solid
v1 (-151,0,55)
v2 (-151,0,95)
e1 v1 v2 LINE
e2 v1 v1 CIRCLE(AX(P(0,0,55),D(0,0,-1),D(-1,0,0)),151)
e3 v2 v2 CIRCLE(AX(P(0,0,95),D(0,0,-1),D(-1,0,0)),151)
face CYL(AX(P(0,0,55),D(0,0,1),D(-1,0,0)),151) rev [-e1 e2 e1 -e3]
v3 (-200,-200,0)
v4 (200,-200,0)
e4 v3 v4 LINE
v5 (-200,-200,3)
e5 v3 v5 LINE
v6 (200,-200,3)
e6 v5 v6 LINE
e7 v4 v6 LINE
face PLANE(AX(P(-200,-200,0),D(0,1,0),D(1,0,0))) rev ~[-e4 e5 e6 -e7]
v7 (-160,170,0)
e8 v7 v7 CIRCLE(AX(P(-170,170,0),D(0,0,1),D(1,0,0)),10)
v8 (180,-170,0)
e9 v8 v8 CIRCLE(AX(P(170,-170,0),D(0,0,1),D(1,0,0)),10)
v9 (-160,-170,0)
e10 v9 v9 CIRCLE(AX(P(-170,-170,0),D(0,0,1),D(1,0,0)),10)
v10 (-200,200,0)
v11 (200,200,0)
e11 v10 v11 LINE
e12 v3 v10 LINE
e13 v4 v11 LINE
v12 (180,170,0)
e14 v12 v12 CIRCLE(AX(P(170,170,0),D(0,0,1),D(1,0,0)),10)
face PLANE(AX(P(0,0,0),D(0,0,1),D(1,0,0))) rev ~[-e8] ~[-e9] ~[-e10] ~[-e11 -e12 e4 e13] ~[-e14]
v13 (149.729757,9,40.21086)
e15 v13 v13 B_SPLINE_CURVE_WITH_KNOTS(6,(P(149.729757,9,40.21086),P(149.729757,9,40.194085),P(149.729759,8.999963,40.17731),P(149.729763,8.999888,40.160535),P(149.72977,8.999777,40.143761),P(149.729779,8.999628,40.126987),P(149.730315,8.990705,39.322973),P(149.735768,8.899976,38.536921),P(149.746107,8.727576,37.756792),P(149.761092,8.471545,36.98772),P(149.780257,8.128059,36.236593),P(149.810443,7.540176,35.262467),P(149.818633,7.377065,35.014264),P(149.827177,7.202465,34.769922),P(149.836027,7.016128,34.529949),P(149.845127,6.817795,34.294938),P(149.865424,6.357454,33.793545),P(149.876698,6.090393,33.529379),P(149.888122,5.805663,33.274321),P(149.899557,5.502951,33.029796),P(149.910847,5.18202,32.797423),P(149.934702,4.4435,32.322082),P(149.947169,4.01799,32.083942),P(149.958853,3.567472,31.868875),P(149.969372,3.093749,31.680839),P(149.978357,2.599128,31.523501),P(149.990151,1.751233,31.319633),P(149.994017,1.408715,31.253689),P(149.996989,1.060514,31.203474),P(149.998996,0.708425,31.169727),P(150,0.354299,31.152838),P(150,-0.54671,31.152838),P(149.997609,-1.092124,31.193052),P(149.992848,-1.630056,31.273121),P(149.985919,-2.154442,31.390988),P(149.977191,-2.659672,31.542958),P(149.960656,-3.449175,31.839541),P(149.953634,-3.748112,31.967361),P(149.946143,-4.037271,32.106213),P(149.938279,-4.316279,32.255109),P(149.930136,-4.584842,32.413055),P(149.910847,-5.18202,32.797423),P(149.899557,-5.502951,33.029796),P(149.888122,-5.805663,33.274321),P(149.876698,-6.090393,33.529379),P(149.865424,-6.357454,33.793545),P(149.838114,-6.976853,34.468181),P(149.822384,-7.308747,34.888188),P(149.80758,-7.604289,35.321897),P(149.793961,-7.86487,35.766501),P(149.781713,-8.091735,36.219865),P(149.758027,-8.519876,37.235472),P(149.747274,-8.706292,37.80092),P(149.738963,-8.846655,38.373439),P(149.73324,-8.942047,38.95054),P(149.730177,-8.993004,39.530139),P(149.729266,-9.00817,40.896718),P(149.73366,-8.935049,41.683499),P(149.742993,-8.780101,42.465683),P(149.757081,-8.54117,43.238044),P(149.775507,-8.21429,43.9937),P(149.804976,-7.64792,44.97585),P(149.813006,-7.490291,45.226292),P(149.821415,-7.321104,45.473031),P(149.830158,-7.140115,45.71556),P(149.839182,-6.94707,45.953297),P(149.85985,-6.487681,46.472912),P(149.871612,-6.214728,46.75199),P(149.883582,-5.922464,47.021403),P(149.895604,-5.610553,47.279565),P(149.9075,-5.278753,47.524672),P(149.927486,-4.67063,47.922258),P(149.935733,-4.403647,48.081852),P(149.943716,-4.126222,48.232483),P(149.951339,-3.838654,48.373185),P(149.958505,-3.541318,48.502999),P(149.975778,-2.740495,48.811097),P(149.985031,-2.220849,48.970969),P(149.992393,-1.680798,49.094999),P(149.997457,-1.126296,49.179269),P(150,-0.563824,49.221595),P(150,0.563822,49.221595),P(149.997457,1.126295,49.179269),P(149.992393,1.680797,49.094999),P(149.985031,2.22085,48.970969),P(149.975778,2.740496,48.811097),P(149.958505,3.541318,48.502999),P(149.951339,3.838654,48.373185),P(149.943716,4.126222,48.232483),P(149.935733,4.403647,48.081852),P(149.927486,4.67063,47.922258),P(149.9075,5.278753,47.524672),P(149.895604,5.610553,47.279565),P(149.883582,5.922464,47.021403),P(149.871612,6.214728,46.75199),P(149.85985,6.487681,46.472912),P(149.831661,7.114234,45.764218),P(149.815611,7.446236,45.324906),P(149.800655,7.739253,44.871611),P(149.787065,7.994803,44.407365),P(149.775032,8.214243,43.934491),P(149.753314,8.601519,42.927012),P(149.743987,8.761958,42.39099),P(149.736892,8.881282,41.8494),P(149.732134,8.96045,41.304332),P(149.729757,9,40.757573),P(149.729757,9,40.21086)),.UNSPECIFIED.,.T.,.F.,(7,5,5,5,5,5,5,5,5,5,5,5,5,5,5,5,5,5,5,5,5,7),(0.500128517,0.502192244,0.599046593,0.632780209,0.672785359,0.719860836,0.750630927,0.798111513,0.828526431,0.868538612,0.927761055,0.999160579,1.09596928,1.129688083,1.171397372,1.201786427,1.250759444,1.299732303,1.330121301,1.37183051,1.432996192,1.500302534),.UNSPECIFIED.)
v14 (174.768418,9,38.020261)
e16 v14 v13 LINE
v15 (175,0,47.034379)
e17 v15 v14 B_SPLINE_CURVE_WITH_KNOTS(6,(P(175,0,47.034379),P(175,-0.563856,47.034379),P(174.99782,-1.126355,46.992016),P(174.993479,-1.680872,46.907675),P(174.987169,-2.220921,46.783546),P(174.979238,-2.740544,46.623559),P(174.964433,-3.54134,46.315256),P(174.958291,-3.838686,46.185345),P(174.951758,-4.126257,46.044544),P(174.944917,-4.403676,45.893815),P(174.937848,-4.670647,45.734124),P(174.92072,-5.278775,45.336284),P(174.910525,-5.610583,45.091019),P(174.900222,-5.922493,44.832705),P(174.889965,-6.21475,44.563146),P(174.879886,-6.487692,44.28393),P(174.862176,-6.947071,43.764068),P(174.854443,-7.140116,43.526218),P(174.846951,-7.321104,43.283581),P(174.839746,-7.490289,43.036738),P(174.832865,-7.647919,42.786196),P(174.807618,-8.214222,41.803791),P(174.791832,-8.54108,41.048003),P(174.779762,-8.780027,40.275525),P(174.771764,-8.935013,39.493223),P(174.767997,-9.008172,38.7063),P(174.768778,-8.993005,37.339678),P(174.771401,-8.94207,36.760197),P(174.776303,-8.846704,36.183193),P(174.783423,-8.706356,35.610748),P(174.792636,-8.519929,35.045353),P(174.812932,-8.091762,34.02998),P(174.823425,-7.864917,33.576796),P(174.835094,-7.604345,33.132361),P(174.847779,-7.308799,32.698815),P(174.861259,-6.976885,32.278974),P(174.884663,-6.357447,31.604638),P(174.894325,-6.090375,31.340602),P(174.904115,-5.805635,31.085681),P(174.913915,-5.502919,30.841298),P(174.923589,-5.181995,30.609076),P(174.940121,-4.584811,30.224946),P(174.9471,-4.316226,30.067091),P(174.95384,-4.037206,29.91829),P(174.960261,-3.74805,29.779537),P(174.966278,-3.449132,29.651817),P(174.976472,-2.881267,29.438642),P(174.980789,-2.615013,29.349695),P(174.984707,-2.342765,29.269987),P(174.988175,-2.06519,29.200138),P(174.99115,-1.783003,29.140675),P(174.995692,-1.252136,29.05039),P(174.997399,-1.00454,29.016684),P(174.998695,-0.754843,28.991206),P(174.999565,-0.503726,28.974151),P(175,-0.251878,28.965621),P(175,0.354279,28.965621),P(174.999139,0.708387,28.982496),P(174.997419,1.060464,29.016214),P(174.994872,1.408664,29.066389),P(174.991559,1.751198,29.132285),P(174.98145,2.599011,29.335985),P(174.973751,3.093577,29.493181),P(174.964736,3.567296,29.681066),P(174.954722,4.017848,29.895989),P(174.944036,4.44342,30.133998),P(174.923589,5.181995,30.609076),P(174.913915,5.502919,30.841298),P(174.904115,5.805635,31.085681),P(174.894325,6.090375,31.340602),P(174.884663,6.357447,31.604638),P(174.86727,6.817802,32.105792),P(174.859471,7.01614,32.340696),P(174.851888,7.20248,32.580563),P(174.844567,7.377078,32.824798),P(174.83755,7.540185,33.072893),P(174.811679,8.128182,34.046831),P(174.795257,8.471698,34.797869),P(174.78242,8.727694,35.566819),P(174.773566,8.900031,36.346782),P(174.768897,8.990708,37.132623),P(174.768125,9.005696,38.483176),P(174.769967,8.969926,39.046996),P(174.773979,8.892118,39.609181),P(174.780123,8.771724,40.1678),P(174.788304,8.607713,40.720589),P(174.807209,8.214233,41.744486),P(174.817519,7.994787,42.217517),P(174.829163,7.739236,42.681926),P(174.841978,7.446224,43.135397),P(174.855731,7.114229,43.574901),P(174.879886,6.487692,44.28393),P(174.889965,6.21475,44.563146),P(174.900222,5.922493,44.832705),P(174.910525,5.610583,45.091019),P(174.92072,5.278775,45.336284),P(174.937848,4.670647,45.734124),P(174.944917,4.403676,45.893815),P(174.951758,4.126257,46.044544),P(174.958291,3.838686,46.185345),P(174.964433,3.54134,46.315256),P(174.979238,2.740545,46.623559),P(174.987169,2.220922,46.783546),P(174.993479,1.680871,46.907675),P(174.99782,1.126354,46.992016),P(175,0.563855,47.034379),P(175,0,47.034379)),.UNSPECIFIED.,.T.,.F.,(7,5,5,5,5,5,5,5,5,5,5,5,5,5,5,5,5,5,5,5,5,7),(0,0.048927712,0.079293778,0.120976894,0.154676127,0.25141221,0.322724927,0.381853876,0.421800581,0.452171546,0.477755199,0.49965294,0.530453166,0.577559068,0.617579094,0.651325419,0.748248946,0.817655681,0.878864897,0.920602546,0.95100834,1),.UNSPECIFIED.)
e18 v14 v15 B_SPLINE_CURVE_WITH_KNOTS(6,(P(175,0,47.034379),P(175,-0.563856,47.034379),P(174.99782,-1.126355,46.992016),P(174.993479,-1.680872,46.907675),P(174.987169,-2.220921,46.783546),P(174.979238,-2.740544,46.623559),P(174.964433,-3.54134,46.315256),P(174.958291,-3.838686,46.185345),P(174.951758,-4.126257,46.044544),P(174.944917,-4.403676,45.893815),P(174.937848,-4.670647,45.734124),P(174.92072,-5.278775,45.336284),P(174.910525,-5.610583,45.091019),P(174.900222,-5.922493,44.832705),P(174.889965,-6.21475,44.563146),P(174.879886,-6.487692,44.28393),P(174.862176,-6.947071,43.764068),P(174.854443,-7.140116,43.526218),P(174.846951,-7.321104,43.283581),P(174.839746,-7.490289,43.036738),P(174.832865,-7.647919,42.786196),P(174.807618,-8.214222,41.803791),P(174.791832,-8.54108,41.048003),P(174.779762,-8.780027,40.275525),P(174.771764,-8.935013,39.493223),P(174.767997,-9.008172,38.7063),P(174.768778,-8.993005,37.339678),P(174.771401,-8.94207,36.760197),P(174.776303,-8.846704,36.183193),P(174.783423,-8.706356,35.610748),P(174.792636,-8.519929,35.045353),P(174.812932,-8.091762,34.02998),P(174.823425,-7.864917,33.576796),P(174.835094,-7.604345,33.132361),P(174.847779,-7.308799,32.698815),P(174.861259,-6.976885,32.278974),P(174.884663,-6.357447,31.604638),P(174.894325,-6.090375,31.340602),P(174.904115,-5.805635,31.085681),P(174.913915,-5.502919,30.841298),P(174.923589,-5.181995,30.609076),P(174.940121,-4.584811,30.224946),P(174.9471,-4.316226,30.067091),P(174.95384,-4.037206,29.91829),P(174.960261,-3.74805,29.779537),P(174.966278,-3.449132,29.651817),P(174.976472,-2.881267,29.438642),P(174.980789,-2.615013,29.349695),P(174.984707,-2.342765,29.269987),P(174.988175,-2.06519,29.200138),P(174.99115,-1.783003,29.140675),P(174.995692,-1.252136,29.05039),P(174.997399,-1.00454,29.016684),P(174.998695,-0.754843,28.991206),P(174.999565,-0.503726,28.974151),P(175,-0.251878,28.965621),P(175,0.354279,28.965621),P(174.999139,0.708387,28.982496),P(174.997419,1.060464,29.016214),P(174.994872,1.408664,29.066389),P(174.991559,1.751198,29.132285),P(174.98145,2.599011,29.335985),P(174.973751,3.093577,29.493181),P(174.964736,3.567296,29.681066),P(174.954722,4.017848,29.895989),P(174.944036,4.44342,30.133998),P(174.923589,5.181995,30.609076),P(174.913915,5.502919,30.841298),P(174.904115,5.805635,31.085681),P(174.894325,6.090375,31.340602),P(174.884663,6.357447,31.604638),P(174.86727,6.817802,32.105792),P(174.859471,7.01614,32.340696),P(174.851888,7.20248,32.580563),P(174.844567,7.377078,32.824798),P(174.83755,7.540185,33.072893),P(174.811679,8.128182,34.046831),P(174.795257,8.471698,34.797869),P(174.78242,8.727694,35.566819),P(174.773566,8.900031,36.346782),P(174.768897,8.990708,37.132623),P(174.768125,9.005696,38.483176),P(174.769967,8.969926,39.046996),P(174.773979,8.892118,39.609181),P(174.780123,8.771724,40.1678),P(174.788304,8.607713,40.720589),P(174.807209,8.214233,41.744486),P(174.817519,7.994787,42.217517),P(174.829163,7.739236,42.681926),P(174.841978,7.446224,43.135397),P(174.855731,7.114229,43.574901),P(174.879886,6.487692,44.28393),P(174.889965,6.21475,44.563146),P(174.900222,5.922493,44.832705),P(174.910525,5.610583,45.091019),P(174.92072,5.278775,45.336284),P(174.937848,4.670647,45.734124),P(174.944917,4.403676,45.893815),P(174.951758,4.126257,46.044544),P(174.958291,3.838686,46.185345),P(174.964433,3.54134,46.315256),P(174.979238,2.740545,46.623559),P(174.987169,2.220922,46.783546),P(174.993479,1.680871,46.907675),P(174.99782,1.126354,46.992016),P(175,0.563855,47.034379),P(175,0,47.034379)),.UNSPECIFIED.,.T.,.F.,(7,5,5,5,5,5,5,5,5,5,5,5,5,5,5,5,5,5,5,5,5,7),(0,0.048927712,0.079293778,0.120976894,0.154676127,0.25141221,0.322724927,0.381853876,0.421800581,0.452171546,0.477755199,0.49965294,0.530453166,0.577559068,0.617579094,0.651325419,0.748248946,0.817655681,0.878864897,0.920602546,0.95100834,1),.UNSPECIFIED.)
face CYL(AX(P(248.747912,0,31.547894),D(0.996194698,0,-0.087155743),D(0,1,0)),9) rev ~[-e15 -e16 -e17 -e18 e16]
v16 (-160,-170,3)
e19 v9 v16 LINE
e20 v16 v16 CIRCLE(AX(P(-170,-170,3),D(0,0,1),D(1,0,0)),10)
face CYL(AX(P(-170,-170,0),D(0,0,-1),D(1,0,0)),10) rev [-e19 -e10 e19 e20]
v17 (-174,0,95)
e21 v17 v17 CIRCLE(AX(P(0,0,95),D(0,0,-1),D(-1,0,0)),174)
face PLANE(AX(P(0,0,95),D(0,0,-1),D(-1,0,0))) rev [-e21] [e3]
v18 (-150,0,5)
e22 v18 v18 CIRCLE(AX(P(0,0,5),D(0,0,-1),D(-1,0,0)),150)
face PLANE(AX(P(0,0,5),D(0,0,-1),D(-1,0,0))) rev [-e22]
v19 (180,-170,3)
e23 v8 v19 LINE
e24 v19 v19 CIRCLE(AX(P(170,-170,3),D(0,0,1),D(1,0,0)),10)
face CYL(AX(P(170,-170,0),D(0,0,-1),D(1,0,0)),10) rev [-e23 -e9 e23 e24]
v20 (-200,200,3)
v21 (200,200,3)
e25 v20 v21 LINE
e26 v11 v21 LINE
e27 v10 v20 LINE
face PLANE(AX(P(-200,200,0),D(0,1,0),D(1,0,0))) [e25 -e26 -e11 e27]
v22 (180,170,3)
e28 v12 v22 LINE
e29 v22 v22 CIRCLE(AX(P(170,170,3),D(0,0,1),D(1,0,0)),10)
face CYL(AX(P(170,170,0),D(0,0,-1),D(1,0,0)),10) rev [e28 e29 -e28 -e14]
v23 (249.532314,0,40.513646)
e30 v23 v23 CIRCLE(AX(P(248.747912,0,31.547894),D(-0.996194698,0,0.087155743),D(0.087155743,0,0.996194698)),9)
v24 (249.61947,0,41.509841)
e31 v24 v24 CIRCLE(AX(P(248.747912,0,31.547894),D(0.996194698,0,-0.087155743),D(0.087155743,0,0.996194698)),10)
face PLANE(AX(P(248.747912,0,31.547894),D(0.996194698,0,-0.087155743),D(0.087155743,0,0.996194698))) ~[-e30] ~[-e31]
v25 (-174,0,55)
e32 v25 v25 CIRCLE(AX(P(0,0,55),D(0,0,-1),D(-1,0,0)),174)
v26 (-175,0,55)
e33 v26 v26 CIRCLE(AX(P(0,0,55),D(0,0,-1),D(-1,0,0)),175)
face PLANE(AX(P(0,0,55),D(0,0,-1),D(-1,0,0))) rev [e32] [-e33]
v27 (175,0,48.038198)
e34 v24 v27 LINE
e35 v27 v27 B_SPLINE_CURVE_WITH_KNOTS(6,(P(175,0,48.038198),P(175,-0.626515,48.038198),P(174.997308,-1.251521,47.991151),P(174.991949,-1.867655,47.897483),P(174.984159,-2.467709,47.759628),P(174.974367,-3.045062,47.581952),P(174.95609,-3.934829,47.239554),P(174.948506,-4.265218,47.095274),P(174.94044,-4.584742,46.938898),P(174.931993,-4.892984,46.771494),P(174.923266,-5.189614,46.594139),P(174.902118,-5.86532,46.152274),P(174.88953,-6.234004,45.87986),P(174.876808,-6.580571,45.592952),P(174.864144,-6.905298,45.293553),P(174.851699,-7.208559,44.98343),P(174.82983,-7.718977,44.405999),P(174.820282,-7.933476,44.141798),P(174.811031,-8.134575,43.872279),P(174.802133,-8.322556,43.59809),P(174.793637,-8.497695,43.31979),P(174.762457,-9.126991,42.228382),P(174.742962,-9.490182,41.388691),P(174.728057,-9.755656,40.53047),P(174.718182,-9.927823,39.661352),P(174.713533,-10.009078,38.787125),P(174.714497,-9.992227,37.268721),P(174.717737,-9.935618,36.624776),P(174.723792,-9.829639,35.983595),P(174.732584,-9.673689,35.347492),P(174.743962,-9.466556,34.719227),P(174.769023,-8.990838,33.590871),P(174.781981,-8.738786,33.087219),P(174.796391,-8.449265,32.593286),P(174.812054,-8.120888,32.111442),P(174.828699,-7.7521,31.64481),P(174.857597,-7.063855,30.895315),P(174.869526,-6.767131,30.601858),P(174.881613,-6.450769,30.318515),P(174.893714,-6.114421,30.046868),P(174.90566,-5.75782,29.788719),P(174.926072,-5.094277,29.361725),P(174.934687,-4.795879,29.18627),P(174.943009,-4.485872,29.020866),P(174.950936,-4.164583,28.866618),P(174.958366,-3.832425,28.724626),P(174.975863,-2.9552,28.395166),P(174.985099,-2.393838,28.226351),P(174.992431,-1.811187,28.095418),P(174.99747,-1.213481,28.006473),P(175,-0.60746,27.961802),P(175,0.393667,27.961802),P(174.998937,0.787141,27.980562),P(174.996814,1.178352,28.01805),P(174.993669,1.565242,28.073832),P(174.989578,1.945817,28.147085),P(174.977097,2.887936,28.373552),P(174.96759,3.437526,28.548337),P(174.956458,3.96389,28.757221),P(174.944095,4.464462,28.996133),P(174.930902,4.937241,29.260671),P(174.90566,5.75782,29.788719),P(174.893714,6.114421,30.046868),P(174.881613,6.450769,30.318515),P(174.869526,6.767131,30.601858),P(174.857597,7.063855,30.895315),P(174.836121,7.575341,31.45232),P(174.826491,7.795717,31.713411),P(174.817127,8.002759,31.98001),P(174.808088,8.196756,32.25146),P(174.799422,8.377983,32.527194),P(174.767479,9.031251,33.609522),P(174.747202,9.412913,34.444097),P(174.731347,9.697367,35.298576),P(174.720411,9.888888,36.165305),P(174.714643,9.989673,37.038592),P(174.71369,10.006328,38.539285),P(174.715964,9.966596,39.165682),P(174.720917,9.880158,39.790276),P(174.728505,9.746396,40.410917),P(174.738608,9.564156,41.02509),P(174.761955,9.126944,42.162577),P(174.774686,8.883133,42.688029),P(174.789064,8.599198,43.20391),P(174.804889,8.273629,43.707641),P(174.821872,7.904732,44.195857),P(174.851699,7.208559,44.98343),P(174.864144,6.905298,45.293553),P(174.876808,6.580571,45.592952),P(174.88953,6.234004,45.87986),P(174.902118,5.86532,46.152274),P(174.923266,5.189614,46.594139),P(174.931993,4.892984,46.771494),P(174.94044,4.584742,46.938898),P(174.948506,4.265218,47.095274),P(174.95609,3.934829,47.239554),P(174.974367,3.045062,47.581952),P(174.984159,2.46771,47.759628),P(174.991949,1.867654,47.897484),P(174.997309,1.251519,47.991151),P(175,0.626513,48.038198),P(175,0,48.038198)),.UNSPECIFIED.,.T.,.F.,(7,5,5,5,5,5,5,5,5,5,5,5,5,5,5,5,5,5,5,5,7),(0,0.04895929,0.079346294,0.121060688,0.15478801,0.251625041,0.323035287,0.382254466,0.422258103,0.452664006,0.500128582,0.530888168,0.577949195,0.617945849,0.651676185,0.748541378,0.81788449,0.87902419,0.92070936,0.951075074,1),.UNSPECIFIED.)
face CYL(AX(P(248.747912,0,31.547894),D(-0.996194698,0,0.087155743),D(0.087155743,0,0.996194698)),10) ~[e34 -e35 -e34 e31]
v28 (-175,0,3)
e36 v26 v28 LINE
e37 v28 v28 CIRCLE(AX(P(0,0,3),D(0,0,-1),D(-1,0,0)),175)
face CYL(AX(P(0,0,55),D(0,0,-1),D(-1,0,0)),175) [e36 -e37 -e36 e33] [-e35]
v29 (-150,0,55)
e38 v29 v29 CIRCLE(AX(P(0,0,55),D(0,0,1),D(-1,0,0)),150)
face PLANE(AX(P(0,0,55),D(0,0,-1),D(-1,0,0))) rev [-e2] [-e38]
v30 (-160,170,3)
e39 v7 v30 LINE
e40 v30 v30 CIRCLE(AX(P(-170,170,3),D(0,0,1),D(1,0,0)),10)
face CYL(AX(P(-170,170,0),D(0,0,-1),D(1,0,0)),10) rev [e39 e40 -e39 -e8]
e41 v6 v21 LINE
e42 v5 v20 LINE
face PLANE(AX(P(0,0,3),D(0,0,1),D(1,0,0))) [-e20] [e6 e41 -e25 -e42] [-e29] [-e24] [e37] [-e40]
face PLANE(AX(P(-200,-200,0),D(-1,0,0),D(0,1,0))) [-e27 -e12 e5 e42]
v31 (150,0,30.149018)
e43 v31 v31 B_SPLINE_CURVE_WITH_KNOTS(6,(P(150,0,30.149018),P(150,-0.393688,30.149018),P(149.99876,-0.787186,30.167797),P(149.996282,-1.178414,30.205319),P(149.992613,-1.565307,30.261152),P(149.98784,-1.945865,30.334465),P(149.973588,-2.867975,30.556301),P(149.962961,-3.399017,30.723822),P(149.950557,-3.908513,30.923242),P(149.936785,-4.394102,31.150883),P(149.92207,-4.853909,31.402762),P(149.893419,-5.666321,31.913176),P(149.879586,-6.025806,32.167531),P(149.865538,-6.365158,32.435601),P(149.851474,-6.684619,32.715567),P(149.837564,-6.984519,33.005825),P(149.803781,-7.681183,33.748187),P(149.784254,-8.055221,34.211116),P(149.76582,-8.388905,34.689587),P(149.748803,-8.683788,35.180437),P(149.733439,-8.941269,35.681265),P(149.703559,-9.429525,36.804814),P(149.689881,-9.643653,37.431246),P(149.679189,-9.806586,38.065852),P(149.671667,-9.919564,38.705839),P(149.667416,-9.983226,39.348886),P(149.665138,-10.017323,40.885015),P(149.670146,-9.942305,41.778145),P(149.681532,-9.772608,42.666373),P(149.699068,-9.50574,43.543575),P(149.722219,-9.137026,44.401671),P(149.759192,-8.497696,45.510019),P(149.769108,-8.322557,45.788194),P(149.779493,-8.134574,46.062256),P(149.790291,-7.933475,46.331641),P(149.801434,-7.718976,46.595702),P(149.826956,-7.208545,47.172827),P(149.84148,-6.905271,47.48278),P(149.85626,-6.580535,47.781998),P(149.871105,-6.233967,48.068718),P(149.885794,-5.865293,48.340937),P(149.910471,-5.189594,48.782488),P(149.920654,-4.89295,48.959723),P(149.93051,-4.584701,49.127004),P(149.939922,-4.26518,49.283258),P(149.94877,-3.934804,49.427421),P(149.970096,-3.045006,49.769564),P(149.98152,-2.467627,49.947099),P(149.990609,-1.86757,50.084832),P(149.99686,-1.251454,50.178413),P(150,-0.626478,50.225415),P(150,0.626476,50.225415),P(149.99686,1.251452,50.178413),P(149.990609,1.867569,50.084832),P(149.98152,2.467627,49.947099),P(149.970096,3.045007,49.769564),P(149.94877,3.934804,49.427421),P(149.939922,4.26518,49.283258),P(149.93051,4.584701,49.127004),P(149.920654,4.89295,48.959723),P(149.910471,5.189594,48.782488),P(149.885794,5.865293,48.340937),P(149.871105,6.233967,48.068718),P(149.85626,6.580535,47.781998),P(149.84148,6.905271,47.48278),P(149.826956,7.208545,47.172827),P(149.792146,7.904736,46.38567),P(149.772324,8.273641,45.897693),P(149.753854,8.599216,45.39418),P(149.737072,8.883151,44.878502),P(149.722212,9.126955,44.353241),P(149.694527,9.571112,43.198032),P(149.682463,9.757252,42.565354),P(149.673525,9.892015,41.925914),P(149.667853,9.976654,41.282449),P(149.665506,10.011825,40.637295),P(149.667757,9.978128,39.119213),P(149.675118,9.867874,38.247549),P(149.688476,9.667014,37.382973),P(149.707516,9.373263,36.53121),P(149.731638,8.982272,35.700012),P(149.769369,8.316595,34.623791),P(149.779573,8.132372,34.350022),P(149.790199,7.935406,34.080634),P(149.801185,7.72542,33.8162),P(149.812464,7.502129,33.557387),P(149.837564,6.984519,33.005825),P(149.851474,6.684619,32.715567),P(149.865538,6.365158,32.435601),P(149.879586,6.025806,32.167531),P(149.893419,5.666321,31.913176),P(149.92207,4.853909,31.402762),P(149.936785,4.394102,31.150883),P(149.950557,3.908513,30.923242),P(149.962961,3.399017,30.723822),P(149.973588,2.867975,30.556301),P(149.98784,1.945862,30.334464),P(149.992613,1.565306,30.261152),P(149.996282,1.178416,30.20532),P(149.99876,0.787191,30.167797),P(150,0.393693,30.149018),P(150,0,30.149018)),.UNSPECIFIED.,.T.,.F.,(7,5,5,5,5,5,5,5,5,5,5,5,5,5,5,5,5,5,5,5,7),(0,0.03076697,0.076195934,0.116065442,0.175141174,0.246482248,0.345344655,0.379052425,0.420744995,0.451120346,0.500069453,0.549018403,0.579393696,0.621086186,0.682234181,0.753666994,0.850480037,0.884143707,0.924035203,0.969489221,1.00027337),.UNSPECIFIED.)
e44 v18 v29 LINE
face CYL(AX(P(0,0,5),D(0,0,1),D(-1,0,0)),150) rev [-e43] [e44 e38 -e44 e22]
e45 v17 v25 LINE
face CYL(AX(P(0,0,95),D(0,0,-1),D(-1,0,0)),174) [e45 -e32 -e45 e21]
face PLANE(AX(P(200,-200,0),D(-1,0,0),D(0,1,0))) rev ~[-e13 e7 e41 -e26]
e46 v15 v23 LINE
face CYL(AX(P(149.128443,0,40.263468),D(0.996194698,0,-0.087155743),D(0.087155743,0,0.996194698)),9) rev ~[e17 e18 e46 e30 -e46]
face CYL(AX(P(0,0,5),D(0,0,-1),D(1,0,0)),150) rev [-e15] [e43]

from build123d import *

# Parameters (mm, degrees)
F0_W     = 10
F0_H     = 3
F2_W     = 400
F2_H     = 400
F2_R     = 10
F3_DEPTH = 3
F6_R     = 9
F7_DEPTH = 120
F8_R     = 150
F9_DEPTH = 200


with BuildPart() as f1:
    # F0 (on Front) → F1 (revolve)
    with BuildSketch(Plane.XZ):
        Polygon((-175, 5), (-150, 5), (-150, 55), (-151, 55), (-151, 95), (-174, 95), (-174, 55), (-175, 55), align=None)
        Polygon((-10, 5), (-150, 5), (-175, 5), (-175, 2), (-10, 2), align=None)
        with Locations((-5, 3.5)):
            Rectangle(F0_W, F0_H)
    revolve(axis=Axis((0, 0, 187.9212413023), (0, 0, -1)))

    # F2 (on Top) → F3 (join)
    with BuildSketch(Plane.XY):
        Rectangle(F2_W, F2_H)
        with Locations((-170, -170)):
            Circle(F2_R, mode=Mode.SUBTRACT)
        with Locations((170, -170)):
            Circle(F2_R, mode=Mode.SUBTRACT)
        with Locations((-170, 170)):
            Circle(F2_R, mode=Mode.SUBTRACT)
        with Locations((170, 170)):
            Circle(F2_R, mode=Mode.SUBTRACT)
    extrude(amount=F3_DEPTH)

    # F4 (on Front) → F5 (revolve)
    with BuildSketch(Plane.XZ):
        Polygon((249.6194698092, 41.5098406888), (150, 50.2254149636), (149.9128442573, 49.2292202655), (249.5323140664, 40.5136459907), align=None)
    revolve(axis=Axis((262.7442754949, 0, 30.3233706049), (0.9961946981, 0, -0.0871557427)))

    # F6 (on face) → F7 (cut)
    with BuildSketch(Plane(origin=(244.1192753946, 0, -21.3576691452), x_dir=(0, 1, 0), z_dir=(0.9961946981, 0, -0.0871557427))):
        with Locations((0, 53.1076535083)):
            Circle(F6_R)
    extrude(amount=-F7_DEPTH, mode=Mode.SUBTRACT)

    # F8 (on face) → F9 (cut)
    with BuildSketch(Plane.XY.offset(5)):
        Circle(F8_R)
    extrude(amount=F9_DEPTH, mode=Mode.SUBTRACT)


solid = f1.part
